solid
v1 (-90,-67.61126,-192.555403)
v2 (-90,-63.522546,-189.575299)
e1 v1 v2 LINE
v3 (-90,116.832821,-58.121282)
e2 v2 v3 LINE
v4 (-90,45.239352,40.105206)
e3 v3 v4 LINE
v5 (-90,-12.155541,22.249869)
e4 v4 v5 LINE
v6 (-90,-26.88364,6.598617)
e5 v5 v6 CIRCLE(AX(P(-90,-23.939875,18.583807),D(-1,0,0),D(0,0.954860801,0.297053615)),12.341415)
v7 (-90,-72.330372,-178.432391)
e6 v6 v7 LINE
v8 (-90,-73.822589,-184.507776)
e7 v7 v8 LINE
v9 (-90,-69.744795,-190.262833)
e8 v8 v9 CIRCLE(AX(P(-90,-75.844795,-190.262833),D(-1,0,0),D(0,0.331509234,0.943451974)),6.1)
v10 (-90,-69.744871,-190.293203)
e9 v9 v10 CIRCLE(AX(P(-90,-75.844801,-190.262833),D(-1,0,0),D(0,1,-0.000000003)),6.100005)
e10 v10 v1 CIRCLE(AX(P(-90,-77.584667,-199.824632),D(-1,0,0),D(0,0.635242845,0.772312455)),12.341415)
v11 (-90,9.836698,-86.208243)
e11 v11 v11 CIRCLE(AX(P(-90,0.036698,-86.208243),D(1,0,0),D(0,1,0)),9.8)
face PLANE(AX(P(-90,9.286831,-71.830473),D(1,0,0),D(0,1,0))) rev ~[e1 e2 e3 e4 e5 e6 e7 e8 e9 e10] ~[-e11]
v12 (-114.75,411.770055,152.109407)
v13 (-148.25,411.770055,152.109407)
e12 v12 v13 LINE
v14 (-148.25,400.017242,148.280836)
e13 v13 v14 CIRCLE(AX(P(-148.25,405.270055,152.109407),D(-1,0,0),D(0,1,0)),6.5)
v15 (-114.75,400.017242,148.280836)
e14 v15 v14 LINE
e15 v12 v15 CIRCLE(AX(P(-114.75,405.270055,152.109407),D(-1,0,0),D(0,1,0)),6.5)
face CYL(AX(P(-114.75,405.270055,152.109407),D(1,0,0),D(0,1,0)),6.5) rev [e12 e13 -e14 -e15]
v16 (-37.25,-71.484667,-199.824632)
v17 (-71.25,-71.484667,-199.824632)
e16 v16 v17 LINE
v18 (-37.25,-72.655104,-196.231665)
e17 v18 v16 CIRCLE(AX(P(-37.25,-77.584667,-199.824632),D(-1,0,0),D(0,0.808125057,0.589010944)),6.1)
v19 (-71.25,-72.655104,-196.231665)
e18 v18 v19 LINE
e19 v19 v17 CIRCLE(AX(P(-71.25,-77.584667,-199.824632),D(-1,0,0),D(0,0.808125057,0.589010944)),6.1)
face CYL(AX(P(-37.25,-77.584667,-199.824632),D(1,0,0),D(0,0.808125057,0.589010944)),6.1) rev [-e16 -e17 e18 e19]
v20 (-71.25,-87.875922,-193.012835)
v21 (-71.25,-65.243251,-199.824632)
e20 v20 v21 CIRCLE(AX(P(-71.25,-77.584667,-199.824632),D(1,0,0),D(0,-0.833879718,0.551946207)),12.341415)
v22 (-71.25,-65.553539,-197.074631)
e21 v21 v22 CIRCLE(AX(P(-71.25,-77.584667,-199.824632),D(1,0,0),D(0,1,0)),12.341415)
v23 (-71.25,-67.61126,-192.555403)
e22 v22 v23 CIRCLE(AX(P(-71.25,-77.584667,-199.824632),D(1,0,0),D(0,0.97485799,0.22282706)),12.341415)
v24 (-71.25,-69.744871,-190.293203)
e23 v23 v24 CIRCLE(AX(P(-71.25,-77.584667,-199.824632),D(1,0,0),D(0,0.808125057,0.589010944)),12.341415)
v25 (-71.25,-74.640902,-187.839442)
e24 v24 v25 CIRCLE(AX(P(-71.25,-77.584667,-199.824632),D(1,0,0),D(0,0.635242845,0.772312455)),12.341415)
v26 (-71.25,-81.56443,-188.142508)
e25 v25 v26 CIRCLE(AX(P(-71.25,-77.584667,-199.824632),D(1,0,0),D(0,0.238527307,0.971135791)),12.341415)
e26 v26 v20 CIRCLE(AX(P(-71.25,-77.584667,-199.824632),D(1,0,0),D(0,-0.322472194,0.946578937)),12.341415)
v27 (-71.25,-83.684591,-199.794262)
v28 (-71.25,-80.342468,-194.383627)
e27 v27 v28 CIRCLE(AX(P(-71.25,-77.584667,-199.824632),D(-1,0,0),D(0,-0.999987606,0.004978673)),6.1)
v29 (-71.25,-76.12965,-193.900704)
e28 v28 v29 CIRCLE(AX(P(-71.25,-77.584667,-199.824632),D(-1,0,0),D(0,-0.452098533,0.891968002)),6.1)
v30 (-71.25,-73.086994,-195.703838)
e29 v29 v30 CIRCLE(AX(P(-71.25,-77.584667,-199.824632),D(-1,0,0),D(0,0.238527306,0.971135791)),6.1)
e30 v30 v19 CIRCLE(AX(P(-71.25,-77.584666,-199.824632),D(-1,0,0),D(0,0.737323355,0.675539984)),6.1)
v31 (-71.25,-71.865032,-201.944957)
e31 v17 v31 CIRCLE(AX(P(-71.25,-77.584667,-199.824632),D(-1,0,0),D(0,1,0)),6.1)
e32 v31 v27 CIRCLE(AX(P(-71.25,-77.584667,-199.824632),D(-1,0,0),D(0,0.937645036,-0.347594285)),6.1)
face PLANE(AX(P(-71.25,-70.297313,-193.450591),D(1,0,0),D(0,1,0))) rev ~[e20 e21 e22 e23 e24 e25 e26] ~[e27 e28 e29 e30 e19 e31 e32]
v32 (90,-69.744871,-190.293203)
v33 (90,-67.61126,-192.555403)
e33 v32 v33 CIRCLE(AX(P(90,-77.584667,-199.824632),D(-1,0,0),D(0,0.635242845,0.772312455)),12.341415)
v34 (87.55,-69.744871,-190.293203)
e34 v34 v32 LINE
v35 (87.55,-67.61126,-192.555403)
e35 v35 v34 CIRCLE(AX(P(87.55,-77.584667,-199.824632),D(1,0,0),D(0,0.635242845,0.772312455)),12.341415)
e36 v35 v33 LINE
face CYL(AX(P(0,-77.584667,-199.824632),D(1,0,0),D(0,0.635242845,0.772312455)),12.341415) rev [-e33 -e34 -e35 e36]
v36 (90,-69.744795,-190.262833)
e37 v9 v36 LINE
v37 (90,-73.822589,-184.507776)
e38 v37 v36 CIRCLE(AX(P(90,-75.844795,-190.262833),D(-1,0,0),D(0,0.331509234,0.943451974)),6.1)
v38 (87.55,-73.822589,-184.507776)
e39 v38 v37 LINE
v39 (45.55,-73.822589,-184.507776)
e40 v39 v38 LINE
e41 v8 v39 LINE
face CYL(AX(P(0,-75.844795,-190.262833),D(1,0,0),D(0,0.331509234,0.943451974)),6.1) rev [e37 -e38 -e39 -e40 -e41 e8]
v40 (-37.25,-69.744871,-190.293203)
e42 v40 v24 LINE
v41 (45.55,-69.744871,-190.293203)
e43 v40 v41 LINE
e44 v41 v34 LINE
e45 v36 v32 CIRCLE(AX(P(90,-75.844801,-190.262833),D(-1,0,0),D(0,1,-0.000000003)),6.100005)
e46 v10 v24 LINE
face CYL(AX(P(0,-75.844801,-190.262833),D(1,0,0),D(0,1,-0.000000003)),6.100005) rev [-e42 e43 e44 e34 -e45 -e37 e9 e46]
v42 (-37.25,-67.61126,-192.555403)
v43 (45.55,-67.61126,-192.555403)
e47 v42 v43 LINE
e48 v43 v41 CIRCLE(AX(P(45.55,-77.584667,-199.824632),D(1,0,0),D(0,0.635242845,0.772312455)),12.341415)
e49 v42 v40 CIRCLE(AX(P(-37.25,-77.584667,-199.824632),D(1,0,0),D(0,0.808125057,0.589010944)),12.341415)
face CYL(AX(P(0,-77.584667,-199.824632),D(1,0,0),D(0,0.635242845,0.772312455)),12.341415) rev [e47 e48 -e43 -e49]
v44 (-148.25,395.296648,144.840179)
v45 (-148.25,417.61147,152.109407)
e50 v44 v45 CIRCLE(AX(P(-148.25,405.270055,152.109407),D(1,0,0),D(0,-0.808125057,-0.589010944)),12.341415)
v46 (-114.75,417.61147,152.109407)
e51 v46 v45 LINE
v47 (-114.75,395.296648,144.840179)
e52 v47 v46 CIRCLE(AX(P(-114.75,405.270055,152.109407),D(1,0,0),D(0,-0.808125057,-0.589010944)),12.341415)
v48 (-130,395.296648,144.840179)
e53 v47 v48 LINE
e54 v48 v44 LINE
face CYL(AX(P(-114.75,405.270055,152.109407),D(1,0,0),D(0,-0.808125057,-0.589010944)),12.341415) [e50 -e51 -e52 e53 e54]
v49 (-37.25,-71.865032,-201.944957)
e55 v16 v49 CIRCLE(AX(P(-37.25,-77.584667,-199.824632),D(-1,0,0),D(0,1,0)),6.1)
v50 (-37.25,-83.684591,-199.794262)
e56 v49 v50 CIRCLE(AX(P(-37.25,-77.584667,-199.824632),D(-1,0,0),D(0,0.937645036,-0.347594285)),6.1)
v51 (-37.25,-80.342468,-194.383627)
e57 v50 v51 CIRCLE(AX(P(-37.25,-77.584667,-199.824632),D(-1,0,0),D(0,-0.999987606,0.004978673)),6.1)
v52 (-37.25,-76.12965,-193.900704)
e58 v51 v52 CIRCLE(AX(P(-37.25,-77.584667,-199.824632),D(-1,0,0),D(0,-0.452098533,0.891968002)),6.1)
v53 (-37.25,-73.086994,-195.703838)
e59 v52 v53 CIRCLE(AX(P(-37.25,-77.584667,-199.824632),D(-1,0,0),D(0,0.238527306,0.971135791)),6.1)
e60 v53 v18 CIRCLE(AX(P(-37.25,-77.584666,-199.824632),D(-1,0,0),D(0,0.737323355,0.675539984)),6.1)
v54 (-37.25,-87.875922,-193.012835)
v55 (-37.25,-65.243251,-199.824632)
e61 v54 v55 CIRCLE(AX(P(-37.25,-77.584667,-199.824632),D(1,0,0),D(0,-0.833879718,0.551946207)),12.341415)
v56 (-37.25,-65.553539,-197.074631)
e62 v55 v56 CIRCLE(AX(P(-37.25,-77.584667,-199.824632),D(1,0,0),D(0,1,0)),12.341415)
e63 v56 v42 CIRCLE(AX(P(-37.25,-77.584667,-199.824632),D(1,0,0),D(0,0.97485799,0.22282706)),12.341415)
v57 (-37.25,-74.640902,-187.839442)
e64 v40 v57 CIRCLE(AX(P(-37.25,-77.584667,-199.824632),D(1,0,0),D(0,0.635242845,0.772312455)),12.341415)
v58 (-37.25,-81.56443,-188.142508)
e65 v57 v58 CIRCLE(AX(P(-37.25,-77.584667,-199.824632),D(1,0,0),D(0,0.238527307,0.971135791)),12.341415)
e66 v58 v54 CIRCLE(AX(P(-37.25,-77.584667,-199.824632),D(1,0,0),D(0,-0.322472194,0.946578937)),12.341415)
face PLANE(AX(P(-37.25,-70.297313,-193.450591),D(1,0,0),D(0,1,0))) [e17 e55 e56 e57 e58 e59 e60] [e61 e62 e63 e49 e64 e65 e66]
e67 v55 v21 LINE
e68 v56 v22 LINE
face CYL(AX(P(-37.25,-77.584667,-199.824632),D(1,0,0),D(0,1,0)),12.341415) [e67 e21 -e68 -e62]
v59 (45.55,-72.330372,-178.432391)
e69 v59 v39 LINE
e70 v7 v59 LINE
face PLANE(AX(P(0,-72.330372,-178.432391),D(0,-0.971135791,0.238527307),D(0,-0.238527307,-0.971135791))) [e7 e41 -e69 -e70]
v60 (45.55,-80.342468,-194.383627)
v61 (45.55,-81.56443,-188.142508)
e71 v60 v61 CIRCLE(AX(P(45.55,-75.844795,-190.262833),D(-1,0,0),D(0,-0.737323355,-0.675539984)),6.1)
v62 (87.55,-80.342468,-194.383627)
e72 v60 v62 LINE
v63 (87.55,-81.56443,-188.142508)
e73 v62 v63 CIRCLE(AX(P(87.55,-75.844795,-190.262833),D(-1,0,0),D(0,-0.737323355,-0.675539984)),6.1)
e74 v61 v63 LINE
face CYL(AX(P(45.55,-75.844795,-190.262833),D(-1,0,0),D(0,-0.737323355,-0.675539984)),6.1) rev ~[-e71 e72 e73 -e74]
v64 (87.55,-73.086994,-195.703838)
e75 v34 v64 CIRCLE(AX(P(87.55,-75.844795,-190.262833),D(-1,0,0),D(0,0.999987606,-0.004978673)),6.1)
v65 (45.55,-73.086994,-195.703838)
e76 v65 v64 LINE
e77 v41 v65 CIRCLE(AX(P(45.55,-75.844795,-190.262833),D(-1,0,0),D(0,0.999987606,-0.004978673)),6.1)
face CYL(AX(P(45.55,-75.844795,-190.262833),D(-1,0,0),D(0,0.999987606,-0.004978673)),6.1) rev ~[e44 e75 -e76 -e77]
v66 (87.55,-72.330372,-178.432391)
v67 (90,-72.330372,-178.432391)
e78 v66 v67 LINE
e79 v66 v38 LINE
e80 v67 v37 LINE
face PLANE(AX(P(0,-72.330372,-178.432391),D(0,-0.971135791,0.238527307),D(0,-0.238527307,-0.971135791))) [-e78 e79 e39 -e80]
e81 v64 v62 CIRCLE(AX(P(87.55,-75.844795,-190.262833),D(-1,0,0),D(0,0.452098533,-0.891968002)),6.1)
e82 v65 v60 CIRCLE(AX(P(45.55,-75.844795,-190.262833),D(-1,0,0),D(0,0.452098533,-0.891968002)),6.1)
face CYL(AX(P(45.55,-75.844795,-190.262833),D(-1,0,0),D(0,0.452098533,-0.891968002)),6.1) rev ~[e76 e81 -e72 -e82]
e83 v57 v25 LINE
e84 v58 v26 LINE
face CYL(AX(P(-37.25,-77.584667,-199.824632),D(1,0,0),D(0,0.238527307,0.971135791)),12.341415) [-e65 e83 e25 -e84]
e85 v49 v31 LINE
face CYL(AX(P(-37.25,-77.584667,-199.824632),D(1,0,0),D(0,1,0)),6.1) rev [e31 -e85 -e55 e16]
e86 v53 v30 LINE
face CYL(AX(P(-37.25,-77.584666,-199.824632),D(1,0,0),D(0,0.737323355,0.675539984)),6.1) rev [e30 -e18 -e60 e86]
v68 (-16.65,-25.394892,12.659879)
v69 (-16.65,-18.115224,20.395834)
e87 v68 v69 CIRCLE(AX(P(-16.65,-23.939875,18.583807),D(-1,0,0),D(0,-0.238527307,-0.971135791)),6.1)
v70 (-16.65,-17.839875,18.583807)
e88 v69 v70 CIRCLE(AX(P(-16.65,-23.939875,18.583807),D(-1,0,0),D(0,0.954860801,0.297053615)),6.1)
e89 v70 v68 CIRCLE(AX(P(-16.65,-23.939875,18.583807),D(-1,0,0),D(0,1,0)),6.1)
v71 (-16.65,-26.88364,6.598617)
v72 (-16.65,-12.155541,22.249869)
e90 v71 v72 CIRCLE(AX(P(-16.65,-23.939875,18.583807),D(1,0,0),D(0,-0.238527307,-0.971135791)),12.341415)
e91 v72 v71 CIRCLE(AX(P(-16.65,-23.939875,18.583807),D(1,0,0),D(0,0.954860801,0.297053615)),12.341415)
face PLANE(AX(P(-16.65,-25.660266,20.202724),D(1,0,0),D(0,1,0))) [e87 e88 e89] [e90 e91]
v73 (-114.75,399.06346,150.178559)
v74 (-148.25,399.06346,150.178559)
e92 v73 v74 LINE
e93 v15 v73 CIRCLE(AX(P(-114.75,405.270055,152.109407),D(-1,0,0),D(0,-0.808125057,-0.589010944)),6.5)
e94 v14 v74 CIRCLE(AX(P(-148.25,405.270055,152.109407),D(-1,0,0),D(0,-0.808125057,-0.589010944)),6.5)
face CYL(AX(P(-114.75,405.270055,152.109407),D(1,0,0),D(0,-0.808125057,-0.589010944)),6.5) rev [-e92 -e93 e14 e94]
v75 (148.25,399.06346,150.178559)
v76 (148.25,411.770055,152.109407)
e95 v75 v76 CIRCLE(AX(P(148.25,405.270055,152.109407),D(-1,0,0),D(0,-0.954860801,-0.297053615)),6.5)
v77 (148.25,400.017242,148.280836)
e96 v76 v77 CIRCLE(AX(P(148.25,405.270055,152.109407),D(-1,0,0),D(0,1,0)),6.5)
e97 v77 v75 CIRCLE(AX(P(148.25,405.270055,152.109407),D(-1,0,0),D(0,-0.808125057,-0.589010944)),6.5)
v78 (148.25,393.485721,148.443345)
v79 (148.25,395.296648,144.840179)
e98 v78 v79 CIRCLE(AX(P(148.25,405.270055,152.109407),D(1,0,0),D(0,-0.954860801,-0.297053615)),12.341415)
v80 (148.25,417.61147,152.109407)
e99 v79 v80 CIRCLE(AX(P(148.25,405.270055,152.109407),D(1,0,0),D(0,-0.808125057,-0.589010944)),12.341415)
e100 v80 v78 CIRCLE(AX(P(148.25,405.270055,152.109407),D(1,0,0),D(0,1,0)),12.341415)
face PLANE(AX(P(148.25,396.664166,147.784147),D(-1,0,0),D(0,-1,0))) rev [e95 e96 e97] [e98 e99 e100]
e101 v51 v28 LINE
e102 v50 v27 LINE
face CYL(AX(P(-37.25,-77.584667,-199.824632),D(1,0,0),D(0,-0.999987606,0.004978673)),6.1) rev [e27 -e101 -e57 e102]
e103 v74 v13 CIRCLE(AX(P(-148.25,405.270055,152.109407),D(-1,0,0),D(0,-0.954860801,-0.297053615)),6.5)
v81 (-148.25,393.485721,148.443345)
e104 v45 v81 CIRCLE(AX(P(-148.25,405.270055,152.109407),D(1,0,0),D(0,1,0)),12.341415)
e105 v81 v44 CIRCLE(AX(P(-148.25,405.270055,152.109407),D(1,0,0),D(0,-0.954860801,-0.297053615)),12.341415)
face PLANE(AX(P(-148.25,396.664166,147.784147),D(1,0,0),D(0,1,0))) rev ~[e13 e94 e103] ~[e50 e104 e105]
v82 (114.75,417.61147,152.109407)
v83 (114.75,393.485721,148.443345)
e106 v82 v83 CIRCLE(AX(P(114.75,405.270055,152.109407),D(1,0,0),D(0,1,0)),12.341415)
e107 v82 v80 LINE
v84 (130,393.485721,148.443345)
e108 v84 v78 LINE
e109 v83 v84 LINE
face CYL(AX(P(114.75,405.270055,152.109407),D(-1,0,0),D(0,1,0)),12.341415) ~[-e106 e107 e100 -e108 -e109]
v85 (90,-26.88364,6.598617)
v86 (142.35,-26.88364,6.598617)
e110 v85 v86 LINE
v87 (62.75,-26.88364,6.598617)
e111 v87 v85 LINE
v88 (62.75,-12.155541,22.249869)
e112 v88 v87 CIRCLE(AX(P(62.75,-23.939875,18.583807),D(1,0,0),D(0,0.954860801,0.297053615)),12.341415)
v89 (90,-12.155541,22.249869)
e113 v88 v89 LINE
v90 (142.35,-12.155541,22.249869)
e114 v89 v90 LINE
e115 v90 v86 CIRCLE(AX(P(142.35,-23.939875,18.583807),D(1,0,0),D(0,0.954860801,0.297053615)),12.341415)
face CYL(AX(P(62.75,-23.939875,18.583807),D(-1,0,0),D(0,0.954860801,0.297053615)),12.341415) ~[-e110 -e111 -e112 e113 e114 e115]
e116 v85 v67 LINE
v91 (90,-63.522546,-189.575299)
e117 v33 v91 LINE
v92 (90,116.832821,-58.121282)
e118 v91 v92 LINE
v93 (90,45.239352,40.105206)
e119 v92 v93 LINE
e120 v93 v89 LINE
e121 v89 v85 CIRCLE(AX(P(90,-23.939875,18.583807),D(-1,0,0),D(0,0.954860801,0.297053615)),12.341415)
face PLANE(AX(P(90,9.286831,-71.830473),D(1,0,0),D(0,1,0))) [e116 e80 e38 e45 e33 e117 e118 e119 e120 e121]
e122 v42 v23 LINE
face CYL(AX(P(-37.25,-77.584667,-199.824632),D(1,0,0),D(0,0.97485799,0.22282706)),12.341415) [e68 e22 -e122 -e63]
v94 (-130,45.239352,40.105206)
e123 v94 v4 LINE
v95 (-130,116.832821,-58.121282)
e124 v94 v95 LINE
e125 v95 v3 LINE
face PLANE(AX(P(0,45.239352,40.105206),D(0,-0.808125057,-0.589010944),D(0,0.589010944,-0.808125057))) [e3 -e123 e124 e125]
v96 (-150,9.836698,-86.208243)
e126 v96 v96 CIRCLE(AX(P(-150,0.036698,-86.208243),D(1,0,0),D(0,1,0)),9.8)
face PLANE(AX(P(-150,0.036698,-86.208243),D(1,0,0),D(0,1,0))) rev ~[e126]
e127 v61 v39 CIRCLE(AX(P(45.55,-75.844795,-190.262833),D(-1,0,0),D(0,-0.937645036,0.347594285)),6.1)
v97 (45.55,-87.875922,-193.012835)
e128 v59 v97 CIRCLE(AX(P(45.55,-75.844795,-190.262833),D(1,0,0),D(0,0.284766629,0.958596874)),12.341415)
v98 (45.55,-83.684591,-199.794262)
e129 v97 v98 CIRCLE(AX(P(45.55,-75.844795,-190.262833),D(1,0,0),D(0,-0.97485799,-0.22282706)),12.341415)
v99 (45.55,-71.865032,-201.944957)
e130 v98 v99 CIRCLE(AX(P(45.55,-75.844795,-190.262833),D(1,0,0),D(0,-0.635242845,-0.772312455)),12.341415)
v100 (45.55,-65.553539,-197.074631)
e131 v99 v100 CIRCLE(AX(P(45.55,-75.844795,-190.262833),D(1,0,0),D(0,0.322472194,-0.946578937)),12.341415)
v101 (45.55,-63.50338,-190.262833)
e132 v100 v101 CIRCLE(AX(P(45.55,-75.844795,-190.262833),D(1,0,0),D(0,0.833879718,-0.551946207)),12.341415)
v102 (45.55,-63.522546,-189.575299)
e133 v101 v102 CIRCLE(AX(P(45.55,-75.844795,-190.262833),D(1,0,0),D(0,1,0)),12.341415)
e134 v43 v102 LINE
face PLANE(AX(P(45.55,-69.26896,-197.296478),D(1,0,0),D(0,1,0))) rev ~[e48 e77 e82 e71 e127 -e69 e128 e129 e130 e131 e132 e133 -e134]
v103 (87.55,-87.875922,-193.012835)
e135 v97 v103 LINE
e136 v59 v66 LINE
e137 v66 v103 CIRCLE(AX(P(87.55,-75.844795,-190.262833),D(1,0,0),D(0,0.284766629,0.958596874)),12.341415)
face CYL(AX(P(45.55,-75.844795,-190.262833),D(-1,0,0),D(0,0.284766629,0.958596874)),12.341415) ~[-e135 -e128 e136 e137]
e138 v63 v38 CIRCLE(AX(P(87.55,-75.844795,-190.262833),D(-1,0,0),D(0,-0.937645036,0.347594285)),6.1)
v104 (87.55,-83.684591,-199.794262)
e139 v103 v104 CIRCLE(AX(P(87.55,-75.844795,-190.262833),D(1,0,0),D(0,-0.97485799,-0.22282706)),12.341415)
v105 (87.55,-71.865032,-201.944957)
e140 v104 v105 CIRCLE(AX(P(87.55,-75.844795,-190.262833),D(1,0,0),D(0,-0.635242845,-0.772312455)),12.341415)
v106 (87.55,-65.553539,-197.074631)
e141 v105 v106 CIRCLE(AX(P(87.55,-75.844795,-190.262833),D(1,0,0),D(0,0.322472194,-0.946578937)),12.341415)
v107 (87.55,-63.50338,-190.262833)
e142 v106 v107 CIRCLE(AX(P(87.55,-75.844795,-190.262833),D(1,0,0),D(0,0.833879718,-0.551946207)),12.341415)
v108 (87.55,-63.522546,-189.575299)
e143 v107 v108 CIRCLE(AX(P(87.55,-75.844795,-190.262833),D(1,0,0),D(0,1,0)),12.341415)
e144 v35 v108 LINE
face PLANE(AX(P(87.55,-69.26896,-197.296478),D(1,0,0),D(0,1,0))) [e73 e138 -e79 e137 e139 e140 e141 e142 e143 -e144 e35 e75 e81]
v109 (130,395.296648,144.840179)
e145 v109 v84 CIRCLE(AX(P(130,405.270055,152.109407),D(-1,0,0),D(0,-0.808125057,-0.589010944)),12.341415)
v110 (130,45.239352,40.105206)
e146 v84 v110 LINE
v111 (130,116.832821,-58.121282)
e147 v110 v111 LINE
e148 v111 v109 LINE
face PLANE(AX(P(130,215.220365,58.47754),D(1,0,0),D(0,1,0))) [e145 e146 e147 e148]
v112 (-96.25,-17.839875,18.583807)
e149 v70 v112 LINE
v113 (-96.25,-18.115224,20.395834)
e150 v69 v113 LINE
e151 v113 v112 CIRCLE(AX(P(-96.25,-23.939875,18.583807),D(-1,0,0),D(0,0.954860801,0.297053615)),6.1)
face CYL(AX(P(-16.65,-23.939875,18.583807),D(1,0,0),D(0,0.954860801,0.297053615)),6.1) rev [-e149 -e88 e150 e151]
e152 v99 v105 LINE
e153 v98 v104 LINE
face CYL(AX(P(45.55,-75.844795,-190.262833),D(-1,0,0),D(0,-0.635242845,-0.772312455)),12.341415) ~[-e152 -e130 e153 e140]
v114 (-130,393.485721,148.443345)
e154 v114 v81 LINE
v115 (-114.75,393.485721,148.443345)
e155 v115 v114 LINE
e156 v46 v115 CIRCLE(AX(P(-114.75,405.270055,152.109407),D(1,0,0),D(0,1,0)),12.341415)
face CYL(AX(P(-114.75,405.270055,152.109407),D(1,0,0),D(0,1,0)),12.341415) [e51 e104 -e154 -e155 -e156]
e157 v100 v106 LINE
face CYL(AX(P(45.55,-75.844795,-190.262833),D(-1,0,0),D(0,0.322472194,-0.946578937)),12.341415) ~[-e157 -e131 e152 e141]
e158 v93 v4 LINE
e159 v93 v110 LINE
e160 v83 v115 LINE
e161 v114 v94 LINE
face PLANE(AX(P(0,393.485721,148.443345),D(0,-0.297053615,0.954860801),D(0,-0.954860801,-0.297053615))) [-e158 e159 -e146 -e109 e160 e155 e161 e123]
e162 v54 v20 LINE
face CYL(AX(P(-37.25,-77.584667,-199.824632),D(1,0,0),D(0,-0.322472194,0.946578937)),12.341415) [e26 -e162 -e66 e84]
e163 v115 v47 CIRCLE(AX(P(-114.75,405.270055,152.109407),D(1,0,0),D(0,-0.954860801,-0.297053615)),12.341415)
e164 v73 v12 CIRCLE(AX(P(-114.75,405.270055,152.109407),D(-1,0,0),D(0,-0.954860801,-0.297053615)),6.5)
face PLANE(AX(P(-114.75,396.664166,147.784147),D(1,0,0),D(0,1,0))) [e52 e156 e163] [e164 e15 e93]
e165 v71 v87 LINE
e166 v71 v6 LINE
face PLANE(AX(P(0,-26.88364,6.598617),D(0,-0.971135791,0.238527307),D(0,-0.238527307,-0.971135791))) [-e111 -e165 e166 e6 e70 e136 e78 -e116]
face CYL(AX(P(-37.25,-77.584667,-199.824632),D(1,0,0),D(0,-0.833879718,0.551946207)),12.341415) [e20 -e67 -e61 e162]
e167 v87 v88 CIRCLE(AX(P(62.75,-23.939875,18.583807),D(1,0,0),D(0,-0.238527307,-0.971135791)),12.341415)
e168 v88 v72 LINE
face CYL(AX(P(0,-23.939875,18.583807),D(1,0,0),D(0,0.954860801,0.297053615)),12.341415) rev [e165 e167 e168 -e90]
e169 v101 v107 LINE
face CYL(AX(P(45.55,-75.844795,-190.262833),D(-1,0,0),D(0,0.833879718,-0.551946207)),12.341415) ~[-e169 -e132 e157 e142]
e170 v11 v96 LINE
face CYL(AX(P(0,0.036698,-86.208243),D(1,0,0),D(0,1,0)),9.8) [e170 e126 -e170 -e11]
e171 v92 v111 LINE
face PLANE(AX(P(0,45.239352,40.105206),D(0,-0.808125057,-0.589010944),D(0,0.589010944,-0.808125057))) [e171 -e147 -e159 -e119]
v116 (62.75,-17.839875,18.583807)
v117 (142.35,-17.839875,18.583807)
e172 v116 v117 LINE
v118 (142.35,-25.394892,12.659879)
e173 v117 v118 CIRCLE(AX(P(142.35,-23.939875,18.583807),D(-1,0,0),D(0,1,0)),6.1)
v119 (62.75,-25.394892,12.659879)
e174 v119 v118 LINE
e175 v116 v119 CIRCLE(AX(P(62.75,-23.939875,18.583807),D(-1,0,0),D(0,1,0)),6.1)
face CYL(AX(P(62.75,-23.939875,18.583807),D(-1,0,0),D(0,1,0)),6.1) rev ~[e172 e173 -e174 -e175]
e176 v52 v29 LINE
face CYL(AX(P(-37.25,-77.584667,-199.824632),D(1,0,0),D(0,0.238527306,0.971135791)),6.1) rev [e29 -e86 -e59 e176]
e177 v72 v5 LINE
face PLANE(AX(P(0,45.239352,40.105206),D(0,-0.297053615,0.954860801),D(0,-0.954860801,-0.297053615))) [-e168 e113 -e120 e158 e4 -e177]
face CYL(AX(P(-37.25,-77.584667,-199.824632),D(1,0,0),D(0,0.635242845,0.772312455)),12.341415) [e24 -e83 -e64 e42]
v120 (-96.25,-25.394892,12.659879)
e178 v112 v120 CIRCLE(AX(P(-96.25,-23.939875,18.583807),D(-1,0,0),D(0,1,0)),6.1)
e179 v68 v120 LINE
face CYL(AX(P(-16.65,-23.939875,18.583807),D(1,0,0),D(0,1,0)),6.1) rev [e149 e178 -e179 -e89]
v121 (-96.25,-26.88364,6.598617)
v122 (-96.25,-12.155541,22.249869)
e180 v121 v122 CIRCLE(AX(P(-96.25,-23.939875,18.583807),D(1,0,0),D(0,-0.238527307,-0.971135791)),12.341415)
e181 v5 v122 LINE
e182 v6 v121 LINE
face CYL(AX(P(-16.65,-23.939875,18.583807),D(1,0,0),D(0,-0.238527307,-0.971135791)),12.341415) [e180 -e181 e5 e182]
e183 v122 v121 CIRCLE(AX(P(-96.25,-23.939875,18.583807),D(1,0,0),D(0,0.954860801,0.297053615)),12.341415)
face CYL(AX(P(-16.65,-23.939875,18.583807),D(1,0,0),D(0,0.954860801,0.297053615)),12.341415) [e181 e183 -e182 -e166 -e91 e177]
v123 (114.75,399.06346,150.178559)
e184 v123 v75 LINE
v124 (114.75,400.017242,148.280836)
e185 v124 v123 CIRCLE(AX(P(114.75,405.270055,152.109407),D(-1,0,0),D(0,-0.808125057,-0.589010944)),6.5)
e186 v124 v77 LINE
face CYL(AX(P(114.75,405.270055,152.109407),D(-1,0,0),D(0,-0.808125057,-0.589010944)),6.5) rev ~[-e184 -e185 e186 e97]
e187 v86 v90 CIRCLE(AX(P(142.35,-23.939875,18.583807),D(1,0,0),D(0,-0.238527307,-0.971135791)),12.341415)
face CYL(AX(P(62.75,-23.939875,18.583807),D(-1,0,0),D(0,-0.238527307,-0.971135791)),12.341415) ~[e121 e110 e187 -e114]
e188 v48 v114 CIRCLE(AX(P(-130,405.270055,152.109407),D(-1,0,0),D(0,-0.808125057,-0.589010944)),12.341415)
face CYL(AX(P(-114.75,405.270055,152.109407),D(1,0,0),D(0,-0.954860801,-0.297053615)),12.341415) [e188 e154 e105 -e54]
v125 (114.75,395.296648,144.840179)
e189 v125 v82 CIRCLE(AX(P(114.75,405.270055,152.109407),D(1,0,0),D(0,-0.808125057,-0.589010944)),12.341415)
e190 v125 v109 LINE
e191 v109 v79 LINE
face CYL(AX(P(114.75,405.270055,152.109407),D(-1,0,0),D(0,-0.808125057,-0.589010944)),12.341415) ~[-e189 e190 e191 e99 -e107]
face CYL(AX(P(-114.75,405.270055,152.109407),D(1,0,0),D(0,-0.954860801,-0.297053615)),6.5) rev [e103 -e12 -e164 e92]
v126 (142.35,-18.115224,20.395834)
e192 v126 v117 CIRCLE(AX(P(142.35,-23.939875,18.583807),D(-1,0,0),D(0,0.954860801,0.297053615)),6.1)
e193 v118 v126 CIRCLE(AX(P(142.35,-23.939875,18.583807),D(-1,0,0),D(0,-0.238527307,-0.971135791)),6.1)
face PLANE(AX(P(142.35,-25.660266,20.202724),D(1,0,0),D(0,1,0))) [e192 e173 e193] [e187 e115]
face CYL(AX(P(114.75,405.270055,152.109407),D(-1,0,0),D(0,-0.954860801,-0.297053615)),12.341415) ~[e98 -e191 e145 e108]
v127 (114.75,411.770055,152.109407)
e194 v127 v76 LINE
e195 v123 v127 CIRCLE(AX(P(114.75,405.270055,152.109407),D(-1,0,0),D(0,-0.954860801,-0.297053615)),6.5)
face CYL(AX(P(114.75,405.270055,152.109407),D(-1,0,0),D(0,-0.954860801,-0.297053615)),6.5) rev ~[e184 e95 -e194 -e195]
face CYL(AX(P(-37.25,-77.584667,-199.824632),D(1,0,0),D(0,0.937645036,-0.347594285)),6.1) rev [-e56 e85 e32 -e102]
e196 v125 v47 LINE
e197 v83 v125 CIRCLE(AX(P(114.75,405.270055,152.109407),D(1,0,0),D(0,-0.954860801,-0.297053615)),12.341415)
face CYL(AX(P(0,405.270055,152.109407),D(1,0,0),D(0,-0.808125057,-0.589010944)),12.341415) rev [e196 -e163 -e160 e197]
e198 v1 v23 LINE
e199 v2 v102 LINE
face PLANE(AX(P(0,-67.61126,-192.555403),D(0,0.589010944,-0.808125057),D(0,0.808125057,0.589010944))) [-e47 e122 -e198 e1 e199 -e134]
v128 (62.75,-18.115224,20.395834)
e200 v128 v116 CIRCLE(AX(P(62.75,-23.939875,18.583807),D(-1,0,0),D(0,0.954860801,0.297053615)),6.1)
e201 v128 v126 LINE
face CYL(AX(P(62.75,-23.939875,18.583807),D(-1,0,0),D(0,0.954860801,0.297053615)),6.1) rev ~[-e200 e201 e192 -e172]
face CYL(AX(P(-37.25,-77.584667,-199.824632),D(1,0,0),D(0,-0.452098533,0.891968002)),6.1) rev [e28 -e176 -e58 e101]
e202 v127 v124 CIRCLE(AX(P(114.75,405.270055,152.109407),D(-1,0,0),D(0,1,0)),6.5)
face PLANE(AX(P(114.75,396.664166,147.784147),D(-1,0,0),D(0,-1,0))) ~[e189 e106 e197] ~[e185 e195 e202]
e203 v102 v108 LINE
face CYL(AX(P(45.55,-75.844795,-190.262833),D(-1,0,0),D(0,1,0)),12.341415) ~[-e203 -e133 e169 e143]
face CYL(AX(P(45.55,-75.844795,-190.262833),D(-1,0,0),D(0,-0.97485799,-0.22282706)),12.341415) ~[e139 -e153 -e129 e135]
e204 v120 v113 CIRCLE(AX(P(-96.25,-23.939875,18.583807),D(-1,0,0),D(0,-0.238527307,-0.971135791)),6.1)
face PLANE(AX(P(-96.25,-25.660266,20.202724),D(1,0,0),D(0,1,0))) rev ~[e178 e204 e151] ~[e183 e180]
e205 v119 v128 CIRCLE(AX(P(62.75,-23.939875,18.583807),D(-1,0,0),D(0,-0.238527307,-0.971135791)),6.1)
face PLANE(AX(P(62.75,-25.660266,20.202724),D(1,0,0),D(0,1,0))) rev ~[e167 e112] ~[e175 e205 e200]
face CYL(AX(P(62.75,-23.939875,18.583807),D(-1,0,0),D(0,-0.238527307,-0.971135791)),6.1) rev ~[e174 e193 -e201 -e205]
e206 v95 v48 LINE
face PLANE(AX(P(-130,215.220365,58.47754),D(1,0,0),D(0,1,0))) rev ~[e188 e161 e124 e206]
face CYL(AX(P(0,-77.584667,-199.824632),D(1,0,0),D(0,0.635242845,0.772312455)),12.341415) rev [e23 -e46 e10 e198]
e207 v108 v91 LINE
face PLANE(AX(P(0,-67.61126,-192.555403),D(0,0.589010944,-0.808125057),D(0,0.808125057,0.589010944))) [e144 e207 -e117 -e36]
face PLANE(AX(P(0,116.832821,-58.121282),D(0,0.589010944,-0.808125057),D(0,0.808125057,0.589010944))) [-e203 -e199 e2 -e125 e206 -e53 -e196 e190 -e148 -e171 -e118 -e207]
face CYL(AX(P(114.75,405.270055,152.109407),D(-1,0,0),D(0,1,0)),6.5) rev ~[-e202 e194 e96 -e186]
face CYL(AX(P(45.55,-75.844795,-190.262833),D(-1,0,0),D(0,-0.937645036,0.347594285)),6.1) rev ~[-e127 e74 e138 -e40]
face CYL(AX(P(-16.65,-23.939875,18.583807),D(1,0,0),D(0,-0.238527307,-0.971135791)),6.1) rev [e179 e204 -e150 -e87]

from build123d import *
from build123d import SkipClean  # not in build123d's __all__

# Parameters (mm, degrees)
F1_START = -16.65
F1_DEPTH = 79.6
F2_START = -37.25
F2_DEPTH = 34
F3_START = -114.75
F3_DEPTH = 33.5
F4_START = 62.75
F4_DEPTH = 79.6
F5_START = 45.55
F5_DEPTH = 42
F0_R     = 9.8
F6_DEPTH = 150
F8_DEPTH = 90
F9_DEPTH = 130


# Not quite as in the source:
# - after a boolean that leaves OpenCascade's solid faulty, fix() repairs it


with BuildPart() as f1:
    # F0 (on Right) → F1 (new body)
    with BuildSketch(Plane.YZ.offset(F1_START)):
        with BuildLine():
            Line((-18.1152243821, 20.3958344616), (-12.1555414908, 22.2498694633))
            ThreePointArc((-12.1555414908, 22.2498694633), (-32.9276080285, 27.0414189792), (-26.8836398395, 6.5986172255))
            Line((-26.8836398395, 6.5986172255), (-25.3948918397, 12.6598790865))
            ThreePointArc((-25.3948918397, 12.6598790865), (-28.3822482179, 22.7641569875), (-18.1152243821, 20.3958344616))
        make_face()
        with BuildLine():
            ThreePointArc((-26.8836398395, 6.5986172255), (-16.3247484731, 8.8719395429), (-11.5984598892, 18.5838074099))
            ThreePointArc((-11.5984598892, 18.5838074099), (-11.7385251038, 20.4378806886), (-12.1555414908, 22.2498694633))
            Line((-12.1555414908, 22.2498694633), (-18.1152243821, 20.3958344616))
            ThreePointArc((-18.1152243821, 20.3958344616), (-17.9091054013, 19.5002215043), (-17.8398752699, 18.5838074099))
            ThreePointArc((-17.8398752699, 18.5838074099), (-20.1759412293, 13.7835156961), (-25.3948918397, 12.6598790865))
            Line((-25.3948918397, 12.6598790865), (-26.8836398395, 6.5986172255))
        make_face()
    extrude(amount=-F1_DEPTH)



with BuildPart() as f2:
    # F0 (on Right) → F2 (new body)
    with BuildSketch(Plane.YZ.offset(F2_START)):
        with BuildLine():
            Line((-72.6551036638, -196.2316651642), (-67.6112595051, -192.5554031964))
            ThreePointArc((-67.6112595051, -192.5554031964), (-68.6065299554, -191.356834242), (-69.7448706932, -190.2932031158))
            ThreePointArc((-69.7448706932, -190.2932031158), (-70.6550390715, -193.4685207262), (-73.0869940433, -195.7038380233))
            ThreePointArc((-73.0869940433, -195.7038380233), (-72.8636664269, -195.9617109817), (-72.6551036638, -196.2316651642))
        make_face()
        with BuildLine():
            ThreePointArc((-69.7448706932, -190.2932031158), (-72.0550616531, -188.7913185641), (-74.6409019404, -187.8394417408))
            Line((-74.6409019404, -187.8394417408), (-76.1296499401, -193.9007036018))
            ThreePointArc((-76.1296499401, -193.9007036018), (-74.4747709929, -194.5769133854), (-73.0869940433, -195.7038380233))
            ThreePointArc((-73.0869940433, -195.7038380233), (-70.6550390715, -193.4685207262), (-69.7448706932, -190.2932031158))
        make_face()
        with BuildLine():
            Line((-76.1296499401, -193.9007036018), (-74.6409019404, -187.8394417408))
            ThreePointArc((-74.6409019404, -187.8394417408), (-78.1243753606, -187.4950233364), (-81.5644298108, -188.1425080744))
            ThreePointArc((-81.5644298108, -188.1425080744), (-81.831132306, -191.4349111758), (-80.3424675585, -194.3836271121))
            ThreePointArc((-80.3424675585, -194.3836271121), (-78.2793719358, -193.7643196914), (-76.1296499401, -193.9007036018))
        make_face()
        with BuildLine():
            ThreePointArc((-81.5644298108, -188.1425080744), (-85.124263165, -190.0540118898), (-87.8759224883, -193.012834513))
            ThreePointArc((-87.8759224883, -193.012834513), (-86.3429062121, -196.7512996317), (-83.6845909086, -199.7942620195))
            ThreePointArc((-83.6845909086, -199.7942620195), (-82.7744225302, -196.6189444092), (-80.3424675585, -194.3836271121))
            ThreePointArc((-80.3424675585, -194.3836271121), (-81.831132306, -191.4349111758), (-81.5644298108, -188.1425080744))
        make_face()
        with BuildLine():
            ThreePointArc((-83.6845909086, -199.7942620195), (-86.3429062121, -196.7512996317), (-87.8759224883, -193.012834513))
            ThreePointArc((-87.8759224883, -193.012834513), (-81.1414817132, -211.6423981781), (-65.2432511293, -199.8246319252))
            ThreePointArc((-65.2432511293, -199.8246319252), (-65.3210684593, -198.4409063564), (-65.5535391134, -197.0746306224))
            ThreePointArc((-65.5535391134, -197.0746306224), (-68.3051984367, -200.0334532455), (-71.865031791, -201.944957061))
            ThreePointArc((-71.865031791, -201.944957061), (-78.6766955162, -205.8260878027), (-83.6845909086, -199.7942620195))
        make_face()
        with BuildLine():
            ThreePointArc((-65.5535391134, -197.0746306224), (-66.3527593839, -194.7104559496), (-67.6112595051, -192.5554031964))
            Line((-67.6112595051, -192.5554031964), (-72.6551036638, -196.2316651642))
            ThreePointArc((-72.6551036638, -196.2316651642), (-71.7846521409, -197.9352316714), (-71.48466651, -199.8246319252))
            ThreePointArc((-71.48466651, -199.8246319252), (-71.5805107914, -200.9017178582), (-71.865031791, -201.944957061))
            ThreePointArc((-71.865031791, -201.944957061), (-68.3051984367, -200.0334532455), (-65.5535391134, -197.0746306224))
        make_face()
    extrude(amount=-F2_DEPTH)


with BuildPart() as f3:
    # F0 (on Right) → F3 (new body)
    with BuildSketch(Plane.YZ.offset(F3_START)):
        with BuildLine():
            Line((399.0634596914, 150.1785588691), (393.4857211205, 148.4433453134))
            ThreePointArc((393.4857211205, 148.4433453134), (394.2430188732, 146.5672949475), (395.2966478948, 144.840178638))
            Line((395.2966478948, 144.840178638), (400.0172420308, 148.2808362281))
            ThreePointArc((400.0172420308, 148.2808362281), (399.4623147045, 149.1904771133), (399.0634596914, 150.1785588691))
        make_face()
        with BuildLine():
            ThreePointArc((417.6114702803, 152.1094073668), (403.415981621, 164.3107575329), (393.4857211205, 148.4433453134))
            Line((393.4857211205, 148.4433453134), (399.0634596914, 150.1785588691))
            ThreePointArc((399.0634596914, 150.1785588691), (404.2935480778, 158.5356375547), (411.7700548997, 152.1094073668))
            ThreePointArc((411.7700548997, 152.1094073668), (407.2833502521, 145.9290641867), (400.0172420308, 148.2808362281))
            Line((400.0172420308, 148.2808362281), (395.2966478948, 144.840178638))
            ThreePointArc((395.2966478948, 144.840178638), (409.0926570886, 140.3749177698), (417.6114702803, 152.1094073668))
        make_face()
    extrude(amount=-F3_DEPTH)


with BuildPart() as f4:
    # F0 (on Right) → F4 (new body)
    with BuildSketch(Plane.YZ.offset(F4_START)):
        with BuildLine():
            Line((-18.1152243821, 20.3958344616), (-12.1555414908, 22.2498694633))
            ThreePointArc((-12.1555414908, 22.2498694633), (-32.9276080285, 27.0414189792), (-26.8836398395, 6.5986172255))
            Line((-26.8836398395, 6.5986172255), (-25.3948918397, 12.6598790865))
            ThreePointArc((-25.3948918397, 12.6598790865), (-28.3822482179, 22.7641569875), (-18.1152243821, 20.3958344616))
        make_face()
        with BuildLine():
            ThreePointArc((-26.8836398395, 6.5986172255), (-16.3247484731, 8.8719395429), (-11.5984598892, 18.5838074099))
            ThreePointArc((-11.5984598892, 18.5838074099), (-11.7385251038, 20.4378806886), (-12.1555414908, 22.2498694633))
            Line((-12.1555414908, 22.2498694633), (-18.1152243821, 20.3958344616))
            ThreePointArc((-18.1152243821, 20.3958344616), (-17.9091054013, 19.5002215043), (-17.8398752699, 18.5838074099))
            ThreePointArc((-17.8398752699, 18.5838074099), (-20.1759412293, 13.7835156961), (-25.3948918397, 12.6598790865))
            Line((-25.3948918397, 12.6598790865), (-26.8836398395, 6.5986172255))
        make_face()
    extrude(amount=F4_DEPTH)


with BuildPart() as f5:
    # F0 (on Right) → F5 (new body)
    with BuildSketch(Plane.YZ.offset(F5_START)):
        with BuildLine():
            ThreePointArc((-65.5535391134, -197.0746306224), (-66.3527593839, -194.7104559496), (-67.6112595051, -192.5554031964))
            Line((-67.6112595051, -192.5554031964), (-72.6551036638, -196.2316651642))
            ThreePointArc((-72.6551036638, -196.2316651642), (-71.7846521409, -197.9352316714), (-71.48466651, -199.8246319252))
            ThreePointArc((-71.48466651, -199.8246319252), (-71.5805107914, -200.9017178582), (-71.865031791, -201.944957061))
            ThreePointArc((-71.865031791, -201.944957061), (-68.3051984367, -200.0334532455), (-65.5535391134, -197.0746306224))
        make_face()
        with BuildLine():
            Line((-72.6551036638, -196.2316651642), (-67.6112595051, -192.5554031964))
            ThreePointArc((-67.6112595051, -192.5554031964), (-68.6065299554, -191.356834242), (-69.7448706932, -190.2932031158))
            ThreePointArc((-69.7448706932, -190.2932031158), (-70.6550390715, -193.4685207262), (-73.0869940433, -195.7038380233))
            ThreePointArc((-73.0869940433, -195.7038380233), (-72.8636664269, -195.9617109817), (-72.6551036638, -196.2316651642))
        make_face()
        with BuildLine():
            ThreePointArc((-63.5033797112, -190.2628332101), (-63.5081721417, -189.9189323753), (-63.5225457113, -189.5752986283))
            Line((-63.5225457113, -189.5752986283), (-67.6112595051, -192.5554031964))
            ThreePointArc((-67.6112595051, -192.5554031964), (-66.3527593839, -194.7104559496), (-65.5535391134, -197.0746306224))
            ThreePointArc((-65.5535391134, -197.0746306224), (-64.0270288389, -193.8196484134), (-63.5033797112, -190.2628332101))
        make_face()
        with BuildLine():
            ThreePointArc((-63.5225457113, -189.5752986283), (-66.1627938734, -182.6097693789), (-72.3303718412, -178.4323910032))
            Line((-72.3303718412, -178.4323910032), (-73.8225887621, -184.5077761678))
            ThreePointArc((-73.8225887621, -184.5077761678), (-70.8675740493, -186.7361817254), (-69.7447950918, -190.2628332101))
            ThreePointArc((-69.7447950918, -190.2628332101), (-69.7448139922, -190.27801821), (-69.7448706932, -190.2932031158))
            ThreePointArc((-69.7448706932, -190.2932031158), (-68.6065299554, -191.356834242), (-67.6112595051, -192.5554031964))
            Line((-67.6112595051, -192.5554031964), (-63.5225457113, -189.5752986283))
        make_face()
        with BuildLine():
            Line((-73.8225887621, -184.5077761678), (-72.3303718412, -178.4323910032))
            ThreePointArc((-72.3303718412, -178.4323910032), (-84.2875964997, -181.261186806), (-87.8759224883, -193.012834513))
            ThreePointArc((-87.8759224883, -193.012834513), (-85.124263165, -190.0540118898), (-81.5644298108, -188.1425080744))
            ThreePointArc((-81.5644298108, -188.1425080744), (-78.4371999949, -184.7411091299), (-73.8225887621, -184.5077761678))
        make_face()
        with BuildLine():
            ThreePointArc((-81.5644298108, -188.1425080744), (-85.124263165, -190.0540118898), (-87.8759224883, -193.012834513))
            ThreePointArc((-87.8759224883, -193.012834513), (-86.3429062121, -196.7512996317), (-83.6845909086, -199.7942620195))
            ThreePointArc((-83.6845909086, -199.7942620195), (-82.7744225302, -196.6189444092), (-80.3424675585, -194.3836271121))
            ThreePointArc((-80.3424675585, -194.3836271121), (-81.831132306, -191.4349111758), (-81.5644298108, -188.1425080744))
        make_face()
        with BuildLine():
            ThreePointArc((-80.3424675585, -194.3836271121), (-82.7744225302, -196.6189444092), (-83.6845909086, -199.7942620195))
            ThreePointArc((-83.6845909086, -199.7942620195), (-78.0541694481, -202.4048758122), (-71.865031791, -201.944957061))
            ThreePointArc((-71.865031791, -201.944957061), (-71.5805107914, -200.9017178582), (-71.48466651, -199.8246319252))
            ThreePointArc((-71.48466651, -199.8246319252), (-71.7846521409, -197.9352316714), (-72.6551036638, -196.2316651642))
            Line((-72.6551036638, -196.2316651642), (-77.58466651, -199.8246319252))
            Line((-77.58466651, -199.8246319252), (-76.7189272385, -196.2998766082))
            ThreePointArc((-76.7189272385, -196.2998766082), (-78.6964742873, -195.6552283891), (-80.3424675585, -194.3836271121))
        make_face()
        with BuildLine():
            Line((-77.58466651, -199.8246319252), (-72.6551036638, -196.2316651642))
            ThreePointArc((-72.6551036638, -196.2316651642), (-72.8636664269, -195.9617109817), (-73.0869940433, -195.7038380233))
            ThreePointArc((-73.0869940433, -195.7038380233), (-74.8569349642, -196.2823126202), (-76.7189272385, -196.2998766082))
            Line((-76.7189272385, -196.2998766082), (-77.58466651, -199.8246319252))
        make_face()
    extrude(amount=F5_DEPTH)


with BuildPart() as f6:
    # F0 (on Right) → F6 (new body)
    with BuildSketch(Plane.YZ):
        with Locations((0.0366982566, -86.2082434429)):
            Circle(F0_R)
    extrude(amount=-F6_DEPTH)


with BuildPart() as f7_1:
    # F7: instance of F3
    add(f3.part.mirror(Plane.YZ), clean=False)


with BuildPart() as f1_1:
    add(f1.part, clean=False)

    with SkipClean():  # cleaning this boolean's faces spoils the solid; the shape is the same uncleaned
        add(f2.part)  # F8 merges F2

    with SkipClean():  # cleaning this boolean's faces spoils the solid; the shape is the same uncleaned
        add(f4.part)  # F8 merges F4

    with SkipClean():  # cleaning this boolean's faces spoils the solid; the shape is the same uncleaned
        add(f5.part)  # F8 merges F5

    with SkipClean():  # cleaning this boolean's faces spoils the solid; the shape is the same uncleaned
        add(f6.part)  # F8 merges F6
    # F0 (on Right) → F8 (join, symmetric)
    with BuildSketch(Plane.YZ):
        with BuildLine():
            ThreePointArc((-12.1555414908, 22.2498694633), (-11.7385251038, 20.4378806886), (-11.5984598892, 18.5838074099))
            ThreePointArc((-11.5984598892, 18.5838074099), (-16.3247484731, 8.8719395429), (-26.8836398395, 6.5986172255))
            Line((-26.8836398395, 6.5986172255), (-72.3303718412, -178.4323910032))
            ThreePointArc((-72.3303718412, -178.4323910032), (-66.1627938734, -182.6097693789), (-63.5225457113, -189.5752986283))
            Line((-63.5225457113, -189.5752986283), (116.8328210509, -58.1212816783))
            Line((116.8328210509, -58.1212816783), (45.2393521867, 40.1052056848))
            Line((45.2393521867, 40.1052056848), (-12.1555414908, 22.2498694633))
        make_face()
        with Locations((0.0366982566, -86.2082434429)):
            Circle(F0_R, mode=Mode.SUBTRACT)
        with Locations((0.0366982566, -86.2082434429)):
            Circle(F0_R)
        with BuildLine():
            ThreePointArc((-63.5225457113, -189.5752986283), (-66.1627938734, -182.6097693789), (-72.3303718412, -178.4323910032))
            Line((-72.3303718412, -178.4323910032), (-73.8225887621, -184.5077761678))
            ThreePointArc((-73.8225887621, -184.5077761678), (-70.8675740493, -186.7361817254), (-69.7447950918, -190.2628332101))
            ThreePointArc((-69.7447950918, -190.2628332101), (-69.7448139922, -190.27801821), (-69.7448706932, -190.2932031158))
            ThreePointArc((-69.7448706932, -190.2932031158), (-68.6065299554, -191.356834242), (-67.6112595051, -192.5554031964))
            Line((-67.6112595051, -192.5554031964), (-63.5225457113, -189.5752986283))
        make_face()
    with SkipClean():  # cleaning this boolean's faces spoils the solid; the shape is the same uncleaned
        extrude(amount=F8_DEPTH, both=True)


    add(f3.part)  # F9 merges F3

    add(f7_1.part)  # F9 merges F7_1
    # F0 (on Right) → F9 (join, symmetric)
    with BuildSketch(Plane.YZ):
        with BuildLine():
            Line((393.4857211205, 148.4433453134), (45.2393521867, 40.1052056848))
            Line((45.2393521867, 40.1052056848), (116.8328210509, -58.1212816783))
            Line((116.8328210509, -58.1212816783), (395.2966478948, 144.840178638))
            ThreePointArc((395.2966478948, 144.840178638), (394.2430188732, 146.5672949475), (393.4857211205, 148.4433453134))
        make_face()
    extrude(amount=F9_DEPTH, both=True)

    add(f1_1.part.fix(), mode=Mode.REPLACE)


solid = f1_1.part
